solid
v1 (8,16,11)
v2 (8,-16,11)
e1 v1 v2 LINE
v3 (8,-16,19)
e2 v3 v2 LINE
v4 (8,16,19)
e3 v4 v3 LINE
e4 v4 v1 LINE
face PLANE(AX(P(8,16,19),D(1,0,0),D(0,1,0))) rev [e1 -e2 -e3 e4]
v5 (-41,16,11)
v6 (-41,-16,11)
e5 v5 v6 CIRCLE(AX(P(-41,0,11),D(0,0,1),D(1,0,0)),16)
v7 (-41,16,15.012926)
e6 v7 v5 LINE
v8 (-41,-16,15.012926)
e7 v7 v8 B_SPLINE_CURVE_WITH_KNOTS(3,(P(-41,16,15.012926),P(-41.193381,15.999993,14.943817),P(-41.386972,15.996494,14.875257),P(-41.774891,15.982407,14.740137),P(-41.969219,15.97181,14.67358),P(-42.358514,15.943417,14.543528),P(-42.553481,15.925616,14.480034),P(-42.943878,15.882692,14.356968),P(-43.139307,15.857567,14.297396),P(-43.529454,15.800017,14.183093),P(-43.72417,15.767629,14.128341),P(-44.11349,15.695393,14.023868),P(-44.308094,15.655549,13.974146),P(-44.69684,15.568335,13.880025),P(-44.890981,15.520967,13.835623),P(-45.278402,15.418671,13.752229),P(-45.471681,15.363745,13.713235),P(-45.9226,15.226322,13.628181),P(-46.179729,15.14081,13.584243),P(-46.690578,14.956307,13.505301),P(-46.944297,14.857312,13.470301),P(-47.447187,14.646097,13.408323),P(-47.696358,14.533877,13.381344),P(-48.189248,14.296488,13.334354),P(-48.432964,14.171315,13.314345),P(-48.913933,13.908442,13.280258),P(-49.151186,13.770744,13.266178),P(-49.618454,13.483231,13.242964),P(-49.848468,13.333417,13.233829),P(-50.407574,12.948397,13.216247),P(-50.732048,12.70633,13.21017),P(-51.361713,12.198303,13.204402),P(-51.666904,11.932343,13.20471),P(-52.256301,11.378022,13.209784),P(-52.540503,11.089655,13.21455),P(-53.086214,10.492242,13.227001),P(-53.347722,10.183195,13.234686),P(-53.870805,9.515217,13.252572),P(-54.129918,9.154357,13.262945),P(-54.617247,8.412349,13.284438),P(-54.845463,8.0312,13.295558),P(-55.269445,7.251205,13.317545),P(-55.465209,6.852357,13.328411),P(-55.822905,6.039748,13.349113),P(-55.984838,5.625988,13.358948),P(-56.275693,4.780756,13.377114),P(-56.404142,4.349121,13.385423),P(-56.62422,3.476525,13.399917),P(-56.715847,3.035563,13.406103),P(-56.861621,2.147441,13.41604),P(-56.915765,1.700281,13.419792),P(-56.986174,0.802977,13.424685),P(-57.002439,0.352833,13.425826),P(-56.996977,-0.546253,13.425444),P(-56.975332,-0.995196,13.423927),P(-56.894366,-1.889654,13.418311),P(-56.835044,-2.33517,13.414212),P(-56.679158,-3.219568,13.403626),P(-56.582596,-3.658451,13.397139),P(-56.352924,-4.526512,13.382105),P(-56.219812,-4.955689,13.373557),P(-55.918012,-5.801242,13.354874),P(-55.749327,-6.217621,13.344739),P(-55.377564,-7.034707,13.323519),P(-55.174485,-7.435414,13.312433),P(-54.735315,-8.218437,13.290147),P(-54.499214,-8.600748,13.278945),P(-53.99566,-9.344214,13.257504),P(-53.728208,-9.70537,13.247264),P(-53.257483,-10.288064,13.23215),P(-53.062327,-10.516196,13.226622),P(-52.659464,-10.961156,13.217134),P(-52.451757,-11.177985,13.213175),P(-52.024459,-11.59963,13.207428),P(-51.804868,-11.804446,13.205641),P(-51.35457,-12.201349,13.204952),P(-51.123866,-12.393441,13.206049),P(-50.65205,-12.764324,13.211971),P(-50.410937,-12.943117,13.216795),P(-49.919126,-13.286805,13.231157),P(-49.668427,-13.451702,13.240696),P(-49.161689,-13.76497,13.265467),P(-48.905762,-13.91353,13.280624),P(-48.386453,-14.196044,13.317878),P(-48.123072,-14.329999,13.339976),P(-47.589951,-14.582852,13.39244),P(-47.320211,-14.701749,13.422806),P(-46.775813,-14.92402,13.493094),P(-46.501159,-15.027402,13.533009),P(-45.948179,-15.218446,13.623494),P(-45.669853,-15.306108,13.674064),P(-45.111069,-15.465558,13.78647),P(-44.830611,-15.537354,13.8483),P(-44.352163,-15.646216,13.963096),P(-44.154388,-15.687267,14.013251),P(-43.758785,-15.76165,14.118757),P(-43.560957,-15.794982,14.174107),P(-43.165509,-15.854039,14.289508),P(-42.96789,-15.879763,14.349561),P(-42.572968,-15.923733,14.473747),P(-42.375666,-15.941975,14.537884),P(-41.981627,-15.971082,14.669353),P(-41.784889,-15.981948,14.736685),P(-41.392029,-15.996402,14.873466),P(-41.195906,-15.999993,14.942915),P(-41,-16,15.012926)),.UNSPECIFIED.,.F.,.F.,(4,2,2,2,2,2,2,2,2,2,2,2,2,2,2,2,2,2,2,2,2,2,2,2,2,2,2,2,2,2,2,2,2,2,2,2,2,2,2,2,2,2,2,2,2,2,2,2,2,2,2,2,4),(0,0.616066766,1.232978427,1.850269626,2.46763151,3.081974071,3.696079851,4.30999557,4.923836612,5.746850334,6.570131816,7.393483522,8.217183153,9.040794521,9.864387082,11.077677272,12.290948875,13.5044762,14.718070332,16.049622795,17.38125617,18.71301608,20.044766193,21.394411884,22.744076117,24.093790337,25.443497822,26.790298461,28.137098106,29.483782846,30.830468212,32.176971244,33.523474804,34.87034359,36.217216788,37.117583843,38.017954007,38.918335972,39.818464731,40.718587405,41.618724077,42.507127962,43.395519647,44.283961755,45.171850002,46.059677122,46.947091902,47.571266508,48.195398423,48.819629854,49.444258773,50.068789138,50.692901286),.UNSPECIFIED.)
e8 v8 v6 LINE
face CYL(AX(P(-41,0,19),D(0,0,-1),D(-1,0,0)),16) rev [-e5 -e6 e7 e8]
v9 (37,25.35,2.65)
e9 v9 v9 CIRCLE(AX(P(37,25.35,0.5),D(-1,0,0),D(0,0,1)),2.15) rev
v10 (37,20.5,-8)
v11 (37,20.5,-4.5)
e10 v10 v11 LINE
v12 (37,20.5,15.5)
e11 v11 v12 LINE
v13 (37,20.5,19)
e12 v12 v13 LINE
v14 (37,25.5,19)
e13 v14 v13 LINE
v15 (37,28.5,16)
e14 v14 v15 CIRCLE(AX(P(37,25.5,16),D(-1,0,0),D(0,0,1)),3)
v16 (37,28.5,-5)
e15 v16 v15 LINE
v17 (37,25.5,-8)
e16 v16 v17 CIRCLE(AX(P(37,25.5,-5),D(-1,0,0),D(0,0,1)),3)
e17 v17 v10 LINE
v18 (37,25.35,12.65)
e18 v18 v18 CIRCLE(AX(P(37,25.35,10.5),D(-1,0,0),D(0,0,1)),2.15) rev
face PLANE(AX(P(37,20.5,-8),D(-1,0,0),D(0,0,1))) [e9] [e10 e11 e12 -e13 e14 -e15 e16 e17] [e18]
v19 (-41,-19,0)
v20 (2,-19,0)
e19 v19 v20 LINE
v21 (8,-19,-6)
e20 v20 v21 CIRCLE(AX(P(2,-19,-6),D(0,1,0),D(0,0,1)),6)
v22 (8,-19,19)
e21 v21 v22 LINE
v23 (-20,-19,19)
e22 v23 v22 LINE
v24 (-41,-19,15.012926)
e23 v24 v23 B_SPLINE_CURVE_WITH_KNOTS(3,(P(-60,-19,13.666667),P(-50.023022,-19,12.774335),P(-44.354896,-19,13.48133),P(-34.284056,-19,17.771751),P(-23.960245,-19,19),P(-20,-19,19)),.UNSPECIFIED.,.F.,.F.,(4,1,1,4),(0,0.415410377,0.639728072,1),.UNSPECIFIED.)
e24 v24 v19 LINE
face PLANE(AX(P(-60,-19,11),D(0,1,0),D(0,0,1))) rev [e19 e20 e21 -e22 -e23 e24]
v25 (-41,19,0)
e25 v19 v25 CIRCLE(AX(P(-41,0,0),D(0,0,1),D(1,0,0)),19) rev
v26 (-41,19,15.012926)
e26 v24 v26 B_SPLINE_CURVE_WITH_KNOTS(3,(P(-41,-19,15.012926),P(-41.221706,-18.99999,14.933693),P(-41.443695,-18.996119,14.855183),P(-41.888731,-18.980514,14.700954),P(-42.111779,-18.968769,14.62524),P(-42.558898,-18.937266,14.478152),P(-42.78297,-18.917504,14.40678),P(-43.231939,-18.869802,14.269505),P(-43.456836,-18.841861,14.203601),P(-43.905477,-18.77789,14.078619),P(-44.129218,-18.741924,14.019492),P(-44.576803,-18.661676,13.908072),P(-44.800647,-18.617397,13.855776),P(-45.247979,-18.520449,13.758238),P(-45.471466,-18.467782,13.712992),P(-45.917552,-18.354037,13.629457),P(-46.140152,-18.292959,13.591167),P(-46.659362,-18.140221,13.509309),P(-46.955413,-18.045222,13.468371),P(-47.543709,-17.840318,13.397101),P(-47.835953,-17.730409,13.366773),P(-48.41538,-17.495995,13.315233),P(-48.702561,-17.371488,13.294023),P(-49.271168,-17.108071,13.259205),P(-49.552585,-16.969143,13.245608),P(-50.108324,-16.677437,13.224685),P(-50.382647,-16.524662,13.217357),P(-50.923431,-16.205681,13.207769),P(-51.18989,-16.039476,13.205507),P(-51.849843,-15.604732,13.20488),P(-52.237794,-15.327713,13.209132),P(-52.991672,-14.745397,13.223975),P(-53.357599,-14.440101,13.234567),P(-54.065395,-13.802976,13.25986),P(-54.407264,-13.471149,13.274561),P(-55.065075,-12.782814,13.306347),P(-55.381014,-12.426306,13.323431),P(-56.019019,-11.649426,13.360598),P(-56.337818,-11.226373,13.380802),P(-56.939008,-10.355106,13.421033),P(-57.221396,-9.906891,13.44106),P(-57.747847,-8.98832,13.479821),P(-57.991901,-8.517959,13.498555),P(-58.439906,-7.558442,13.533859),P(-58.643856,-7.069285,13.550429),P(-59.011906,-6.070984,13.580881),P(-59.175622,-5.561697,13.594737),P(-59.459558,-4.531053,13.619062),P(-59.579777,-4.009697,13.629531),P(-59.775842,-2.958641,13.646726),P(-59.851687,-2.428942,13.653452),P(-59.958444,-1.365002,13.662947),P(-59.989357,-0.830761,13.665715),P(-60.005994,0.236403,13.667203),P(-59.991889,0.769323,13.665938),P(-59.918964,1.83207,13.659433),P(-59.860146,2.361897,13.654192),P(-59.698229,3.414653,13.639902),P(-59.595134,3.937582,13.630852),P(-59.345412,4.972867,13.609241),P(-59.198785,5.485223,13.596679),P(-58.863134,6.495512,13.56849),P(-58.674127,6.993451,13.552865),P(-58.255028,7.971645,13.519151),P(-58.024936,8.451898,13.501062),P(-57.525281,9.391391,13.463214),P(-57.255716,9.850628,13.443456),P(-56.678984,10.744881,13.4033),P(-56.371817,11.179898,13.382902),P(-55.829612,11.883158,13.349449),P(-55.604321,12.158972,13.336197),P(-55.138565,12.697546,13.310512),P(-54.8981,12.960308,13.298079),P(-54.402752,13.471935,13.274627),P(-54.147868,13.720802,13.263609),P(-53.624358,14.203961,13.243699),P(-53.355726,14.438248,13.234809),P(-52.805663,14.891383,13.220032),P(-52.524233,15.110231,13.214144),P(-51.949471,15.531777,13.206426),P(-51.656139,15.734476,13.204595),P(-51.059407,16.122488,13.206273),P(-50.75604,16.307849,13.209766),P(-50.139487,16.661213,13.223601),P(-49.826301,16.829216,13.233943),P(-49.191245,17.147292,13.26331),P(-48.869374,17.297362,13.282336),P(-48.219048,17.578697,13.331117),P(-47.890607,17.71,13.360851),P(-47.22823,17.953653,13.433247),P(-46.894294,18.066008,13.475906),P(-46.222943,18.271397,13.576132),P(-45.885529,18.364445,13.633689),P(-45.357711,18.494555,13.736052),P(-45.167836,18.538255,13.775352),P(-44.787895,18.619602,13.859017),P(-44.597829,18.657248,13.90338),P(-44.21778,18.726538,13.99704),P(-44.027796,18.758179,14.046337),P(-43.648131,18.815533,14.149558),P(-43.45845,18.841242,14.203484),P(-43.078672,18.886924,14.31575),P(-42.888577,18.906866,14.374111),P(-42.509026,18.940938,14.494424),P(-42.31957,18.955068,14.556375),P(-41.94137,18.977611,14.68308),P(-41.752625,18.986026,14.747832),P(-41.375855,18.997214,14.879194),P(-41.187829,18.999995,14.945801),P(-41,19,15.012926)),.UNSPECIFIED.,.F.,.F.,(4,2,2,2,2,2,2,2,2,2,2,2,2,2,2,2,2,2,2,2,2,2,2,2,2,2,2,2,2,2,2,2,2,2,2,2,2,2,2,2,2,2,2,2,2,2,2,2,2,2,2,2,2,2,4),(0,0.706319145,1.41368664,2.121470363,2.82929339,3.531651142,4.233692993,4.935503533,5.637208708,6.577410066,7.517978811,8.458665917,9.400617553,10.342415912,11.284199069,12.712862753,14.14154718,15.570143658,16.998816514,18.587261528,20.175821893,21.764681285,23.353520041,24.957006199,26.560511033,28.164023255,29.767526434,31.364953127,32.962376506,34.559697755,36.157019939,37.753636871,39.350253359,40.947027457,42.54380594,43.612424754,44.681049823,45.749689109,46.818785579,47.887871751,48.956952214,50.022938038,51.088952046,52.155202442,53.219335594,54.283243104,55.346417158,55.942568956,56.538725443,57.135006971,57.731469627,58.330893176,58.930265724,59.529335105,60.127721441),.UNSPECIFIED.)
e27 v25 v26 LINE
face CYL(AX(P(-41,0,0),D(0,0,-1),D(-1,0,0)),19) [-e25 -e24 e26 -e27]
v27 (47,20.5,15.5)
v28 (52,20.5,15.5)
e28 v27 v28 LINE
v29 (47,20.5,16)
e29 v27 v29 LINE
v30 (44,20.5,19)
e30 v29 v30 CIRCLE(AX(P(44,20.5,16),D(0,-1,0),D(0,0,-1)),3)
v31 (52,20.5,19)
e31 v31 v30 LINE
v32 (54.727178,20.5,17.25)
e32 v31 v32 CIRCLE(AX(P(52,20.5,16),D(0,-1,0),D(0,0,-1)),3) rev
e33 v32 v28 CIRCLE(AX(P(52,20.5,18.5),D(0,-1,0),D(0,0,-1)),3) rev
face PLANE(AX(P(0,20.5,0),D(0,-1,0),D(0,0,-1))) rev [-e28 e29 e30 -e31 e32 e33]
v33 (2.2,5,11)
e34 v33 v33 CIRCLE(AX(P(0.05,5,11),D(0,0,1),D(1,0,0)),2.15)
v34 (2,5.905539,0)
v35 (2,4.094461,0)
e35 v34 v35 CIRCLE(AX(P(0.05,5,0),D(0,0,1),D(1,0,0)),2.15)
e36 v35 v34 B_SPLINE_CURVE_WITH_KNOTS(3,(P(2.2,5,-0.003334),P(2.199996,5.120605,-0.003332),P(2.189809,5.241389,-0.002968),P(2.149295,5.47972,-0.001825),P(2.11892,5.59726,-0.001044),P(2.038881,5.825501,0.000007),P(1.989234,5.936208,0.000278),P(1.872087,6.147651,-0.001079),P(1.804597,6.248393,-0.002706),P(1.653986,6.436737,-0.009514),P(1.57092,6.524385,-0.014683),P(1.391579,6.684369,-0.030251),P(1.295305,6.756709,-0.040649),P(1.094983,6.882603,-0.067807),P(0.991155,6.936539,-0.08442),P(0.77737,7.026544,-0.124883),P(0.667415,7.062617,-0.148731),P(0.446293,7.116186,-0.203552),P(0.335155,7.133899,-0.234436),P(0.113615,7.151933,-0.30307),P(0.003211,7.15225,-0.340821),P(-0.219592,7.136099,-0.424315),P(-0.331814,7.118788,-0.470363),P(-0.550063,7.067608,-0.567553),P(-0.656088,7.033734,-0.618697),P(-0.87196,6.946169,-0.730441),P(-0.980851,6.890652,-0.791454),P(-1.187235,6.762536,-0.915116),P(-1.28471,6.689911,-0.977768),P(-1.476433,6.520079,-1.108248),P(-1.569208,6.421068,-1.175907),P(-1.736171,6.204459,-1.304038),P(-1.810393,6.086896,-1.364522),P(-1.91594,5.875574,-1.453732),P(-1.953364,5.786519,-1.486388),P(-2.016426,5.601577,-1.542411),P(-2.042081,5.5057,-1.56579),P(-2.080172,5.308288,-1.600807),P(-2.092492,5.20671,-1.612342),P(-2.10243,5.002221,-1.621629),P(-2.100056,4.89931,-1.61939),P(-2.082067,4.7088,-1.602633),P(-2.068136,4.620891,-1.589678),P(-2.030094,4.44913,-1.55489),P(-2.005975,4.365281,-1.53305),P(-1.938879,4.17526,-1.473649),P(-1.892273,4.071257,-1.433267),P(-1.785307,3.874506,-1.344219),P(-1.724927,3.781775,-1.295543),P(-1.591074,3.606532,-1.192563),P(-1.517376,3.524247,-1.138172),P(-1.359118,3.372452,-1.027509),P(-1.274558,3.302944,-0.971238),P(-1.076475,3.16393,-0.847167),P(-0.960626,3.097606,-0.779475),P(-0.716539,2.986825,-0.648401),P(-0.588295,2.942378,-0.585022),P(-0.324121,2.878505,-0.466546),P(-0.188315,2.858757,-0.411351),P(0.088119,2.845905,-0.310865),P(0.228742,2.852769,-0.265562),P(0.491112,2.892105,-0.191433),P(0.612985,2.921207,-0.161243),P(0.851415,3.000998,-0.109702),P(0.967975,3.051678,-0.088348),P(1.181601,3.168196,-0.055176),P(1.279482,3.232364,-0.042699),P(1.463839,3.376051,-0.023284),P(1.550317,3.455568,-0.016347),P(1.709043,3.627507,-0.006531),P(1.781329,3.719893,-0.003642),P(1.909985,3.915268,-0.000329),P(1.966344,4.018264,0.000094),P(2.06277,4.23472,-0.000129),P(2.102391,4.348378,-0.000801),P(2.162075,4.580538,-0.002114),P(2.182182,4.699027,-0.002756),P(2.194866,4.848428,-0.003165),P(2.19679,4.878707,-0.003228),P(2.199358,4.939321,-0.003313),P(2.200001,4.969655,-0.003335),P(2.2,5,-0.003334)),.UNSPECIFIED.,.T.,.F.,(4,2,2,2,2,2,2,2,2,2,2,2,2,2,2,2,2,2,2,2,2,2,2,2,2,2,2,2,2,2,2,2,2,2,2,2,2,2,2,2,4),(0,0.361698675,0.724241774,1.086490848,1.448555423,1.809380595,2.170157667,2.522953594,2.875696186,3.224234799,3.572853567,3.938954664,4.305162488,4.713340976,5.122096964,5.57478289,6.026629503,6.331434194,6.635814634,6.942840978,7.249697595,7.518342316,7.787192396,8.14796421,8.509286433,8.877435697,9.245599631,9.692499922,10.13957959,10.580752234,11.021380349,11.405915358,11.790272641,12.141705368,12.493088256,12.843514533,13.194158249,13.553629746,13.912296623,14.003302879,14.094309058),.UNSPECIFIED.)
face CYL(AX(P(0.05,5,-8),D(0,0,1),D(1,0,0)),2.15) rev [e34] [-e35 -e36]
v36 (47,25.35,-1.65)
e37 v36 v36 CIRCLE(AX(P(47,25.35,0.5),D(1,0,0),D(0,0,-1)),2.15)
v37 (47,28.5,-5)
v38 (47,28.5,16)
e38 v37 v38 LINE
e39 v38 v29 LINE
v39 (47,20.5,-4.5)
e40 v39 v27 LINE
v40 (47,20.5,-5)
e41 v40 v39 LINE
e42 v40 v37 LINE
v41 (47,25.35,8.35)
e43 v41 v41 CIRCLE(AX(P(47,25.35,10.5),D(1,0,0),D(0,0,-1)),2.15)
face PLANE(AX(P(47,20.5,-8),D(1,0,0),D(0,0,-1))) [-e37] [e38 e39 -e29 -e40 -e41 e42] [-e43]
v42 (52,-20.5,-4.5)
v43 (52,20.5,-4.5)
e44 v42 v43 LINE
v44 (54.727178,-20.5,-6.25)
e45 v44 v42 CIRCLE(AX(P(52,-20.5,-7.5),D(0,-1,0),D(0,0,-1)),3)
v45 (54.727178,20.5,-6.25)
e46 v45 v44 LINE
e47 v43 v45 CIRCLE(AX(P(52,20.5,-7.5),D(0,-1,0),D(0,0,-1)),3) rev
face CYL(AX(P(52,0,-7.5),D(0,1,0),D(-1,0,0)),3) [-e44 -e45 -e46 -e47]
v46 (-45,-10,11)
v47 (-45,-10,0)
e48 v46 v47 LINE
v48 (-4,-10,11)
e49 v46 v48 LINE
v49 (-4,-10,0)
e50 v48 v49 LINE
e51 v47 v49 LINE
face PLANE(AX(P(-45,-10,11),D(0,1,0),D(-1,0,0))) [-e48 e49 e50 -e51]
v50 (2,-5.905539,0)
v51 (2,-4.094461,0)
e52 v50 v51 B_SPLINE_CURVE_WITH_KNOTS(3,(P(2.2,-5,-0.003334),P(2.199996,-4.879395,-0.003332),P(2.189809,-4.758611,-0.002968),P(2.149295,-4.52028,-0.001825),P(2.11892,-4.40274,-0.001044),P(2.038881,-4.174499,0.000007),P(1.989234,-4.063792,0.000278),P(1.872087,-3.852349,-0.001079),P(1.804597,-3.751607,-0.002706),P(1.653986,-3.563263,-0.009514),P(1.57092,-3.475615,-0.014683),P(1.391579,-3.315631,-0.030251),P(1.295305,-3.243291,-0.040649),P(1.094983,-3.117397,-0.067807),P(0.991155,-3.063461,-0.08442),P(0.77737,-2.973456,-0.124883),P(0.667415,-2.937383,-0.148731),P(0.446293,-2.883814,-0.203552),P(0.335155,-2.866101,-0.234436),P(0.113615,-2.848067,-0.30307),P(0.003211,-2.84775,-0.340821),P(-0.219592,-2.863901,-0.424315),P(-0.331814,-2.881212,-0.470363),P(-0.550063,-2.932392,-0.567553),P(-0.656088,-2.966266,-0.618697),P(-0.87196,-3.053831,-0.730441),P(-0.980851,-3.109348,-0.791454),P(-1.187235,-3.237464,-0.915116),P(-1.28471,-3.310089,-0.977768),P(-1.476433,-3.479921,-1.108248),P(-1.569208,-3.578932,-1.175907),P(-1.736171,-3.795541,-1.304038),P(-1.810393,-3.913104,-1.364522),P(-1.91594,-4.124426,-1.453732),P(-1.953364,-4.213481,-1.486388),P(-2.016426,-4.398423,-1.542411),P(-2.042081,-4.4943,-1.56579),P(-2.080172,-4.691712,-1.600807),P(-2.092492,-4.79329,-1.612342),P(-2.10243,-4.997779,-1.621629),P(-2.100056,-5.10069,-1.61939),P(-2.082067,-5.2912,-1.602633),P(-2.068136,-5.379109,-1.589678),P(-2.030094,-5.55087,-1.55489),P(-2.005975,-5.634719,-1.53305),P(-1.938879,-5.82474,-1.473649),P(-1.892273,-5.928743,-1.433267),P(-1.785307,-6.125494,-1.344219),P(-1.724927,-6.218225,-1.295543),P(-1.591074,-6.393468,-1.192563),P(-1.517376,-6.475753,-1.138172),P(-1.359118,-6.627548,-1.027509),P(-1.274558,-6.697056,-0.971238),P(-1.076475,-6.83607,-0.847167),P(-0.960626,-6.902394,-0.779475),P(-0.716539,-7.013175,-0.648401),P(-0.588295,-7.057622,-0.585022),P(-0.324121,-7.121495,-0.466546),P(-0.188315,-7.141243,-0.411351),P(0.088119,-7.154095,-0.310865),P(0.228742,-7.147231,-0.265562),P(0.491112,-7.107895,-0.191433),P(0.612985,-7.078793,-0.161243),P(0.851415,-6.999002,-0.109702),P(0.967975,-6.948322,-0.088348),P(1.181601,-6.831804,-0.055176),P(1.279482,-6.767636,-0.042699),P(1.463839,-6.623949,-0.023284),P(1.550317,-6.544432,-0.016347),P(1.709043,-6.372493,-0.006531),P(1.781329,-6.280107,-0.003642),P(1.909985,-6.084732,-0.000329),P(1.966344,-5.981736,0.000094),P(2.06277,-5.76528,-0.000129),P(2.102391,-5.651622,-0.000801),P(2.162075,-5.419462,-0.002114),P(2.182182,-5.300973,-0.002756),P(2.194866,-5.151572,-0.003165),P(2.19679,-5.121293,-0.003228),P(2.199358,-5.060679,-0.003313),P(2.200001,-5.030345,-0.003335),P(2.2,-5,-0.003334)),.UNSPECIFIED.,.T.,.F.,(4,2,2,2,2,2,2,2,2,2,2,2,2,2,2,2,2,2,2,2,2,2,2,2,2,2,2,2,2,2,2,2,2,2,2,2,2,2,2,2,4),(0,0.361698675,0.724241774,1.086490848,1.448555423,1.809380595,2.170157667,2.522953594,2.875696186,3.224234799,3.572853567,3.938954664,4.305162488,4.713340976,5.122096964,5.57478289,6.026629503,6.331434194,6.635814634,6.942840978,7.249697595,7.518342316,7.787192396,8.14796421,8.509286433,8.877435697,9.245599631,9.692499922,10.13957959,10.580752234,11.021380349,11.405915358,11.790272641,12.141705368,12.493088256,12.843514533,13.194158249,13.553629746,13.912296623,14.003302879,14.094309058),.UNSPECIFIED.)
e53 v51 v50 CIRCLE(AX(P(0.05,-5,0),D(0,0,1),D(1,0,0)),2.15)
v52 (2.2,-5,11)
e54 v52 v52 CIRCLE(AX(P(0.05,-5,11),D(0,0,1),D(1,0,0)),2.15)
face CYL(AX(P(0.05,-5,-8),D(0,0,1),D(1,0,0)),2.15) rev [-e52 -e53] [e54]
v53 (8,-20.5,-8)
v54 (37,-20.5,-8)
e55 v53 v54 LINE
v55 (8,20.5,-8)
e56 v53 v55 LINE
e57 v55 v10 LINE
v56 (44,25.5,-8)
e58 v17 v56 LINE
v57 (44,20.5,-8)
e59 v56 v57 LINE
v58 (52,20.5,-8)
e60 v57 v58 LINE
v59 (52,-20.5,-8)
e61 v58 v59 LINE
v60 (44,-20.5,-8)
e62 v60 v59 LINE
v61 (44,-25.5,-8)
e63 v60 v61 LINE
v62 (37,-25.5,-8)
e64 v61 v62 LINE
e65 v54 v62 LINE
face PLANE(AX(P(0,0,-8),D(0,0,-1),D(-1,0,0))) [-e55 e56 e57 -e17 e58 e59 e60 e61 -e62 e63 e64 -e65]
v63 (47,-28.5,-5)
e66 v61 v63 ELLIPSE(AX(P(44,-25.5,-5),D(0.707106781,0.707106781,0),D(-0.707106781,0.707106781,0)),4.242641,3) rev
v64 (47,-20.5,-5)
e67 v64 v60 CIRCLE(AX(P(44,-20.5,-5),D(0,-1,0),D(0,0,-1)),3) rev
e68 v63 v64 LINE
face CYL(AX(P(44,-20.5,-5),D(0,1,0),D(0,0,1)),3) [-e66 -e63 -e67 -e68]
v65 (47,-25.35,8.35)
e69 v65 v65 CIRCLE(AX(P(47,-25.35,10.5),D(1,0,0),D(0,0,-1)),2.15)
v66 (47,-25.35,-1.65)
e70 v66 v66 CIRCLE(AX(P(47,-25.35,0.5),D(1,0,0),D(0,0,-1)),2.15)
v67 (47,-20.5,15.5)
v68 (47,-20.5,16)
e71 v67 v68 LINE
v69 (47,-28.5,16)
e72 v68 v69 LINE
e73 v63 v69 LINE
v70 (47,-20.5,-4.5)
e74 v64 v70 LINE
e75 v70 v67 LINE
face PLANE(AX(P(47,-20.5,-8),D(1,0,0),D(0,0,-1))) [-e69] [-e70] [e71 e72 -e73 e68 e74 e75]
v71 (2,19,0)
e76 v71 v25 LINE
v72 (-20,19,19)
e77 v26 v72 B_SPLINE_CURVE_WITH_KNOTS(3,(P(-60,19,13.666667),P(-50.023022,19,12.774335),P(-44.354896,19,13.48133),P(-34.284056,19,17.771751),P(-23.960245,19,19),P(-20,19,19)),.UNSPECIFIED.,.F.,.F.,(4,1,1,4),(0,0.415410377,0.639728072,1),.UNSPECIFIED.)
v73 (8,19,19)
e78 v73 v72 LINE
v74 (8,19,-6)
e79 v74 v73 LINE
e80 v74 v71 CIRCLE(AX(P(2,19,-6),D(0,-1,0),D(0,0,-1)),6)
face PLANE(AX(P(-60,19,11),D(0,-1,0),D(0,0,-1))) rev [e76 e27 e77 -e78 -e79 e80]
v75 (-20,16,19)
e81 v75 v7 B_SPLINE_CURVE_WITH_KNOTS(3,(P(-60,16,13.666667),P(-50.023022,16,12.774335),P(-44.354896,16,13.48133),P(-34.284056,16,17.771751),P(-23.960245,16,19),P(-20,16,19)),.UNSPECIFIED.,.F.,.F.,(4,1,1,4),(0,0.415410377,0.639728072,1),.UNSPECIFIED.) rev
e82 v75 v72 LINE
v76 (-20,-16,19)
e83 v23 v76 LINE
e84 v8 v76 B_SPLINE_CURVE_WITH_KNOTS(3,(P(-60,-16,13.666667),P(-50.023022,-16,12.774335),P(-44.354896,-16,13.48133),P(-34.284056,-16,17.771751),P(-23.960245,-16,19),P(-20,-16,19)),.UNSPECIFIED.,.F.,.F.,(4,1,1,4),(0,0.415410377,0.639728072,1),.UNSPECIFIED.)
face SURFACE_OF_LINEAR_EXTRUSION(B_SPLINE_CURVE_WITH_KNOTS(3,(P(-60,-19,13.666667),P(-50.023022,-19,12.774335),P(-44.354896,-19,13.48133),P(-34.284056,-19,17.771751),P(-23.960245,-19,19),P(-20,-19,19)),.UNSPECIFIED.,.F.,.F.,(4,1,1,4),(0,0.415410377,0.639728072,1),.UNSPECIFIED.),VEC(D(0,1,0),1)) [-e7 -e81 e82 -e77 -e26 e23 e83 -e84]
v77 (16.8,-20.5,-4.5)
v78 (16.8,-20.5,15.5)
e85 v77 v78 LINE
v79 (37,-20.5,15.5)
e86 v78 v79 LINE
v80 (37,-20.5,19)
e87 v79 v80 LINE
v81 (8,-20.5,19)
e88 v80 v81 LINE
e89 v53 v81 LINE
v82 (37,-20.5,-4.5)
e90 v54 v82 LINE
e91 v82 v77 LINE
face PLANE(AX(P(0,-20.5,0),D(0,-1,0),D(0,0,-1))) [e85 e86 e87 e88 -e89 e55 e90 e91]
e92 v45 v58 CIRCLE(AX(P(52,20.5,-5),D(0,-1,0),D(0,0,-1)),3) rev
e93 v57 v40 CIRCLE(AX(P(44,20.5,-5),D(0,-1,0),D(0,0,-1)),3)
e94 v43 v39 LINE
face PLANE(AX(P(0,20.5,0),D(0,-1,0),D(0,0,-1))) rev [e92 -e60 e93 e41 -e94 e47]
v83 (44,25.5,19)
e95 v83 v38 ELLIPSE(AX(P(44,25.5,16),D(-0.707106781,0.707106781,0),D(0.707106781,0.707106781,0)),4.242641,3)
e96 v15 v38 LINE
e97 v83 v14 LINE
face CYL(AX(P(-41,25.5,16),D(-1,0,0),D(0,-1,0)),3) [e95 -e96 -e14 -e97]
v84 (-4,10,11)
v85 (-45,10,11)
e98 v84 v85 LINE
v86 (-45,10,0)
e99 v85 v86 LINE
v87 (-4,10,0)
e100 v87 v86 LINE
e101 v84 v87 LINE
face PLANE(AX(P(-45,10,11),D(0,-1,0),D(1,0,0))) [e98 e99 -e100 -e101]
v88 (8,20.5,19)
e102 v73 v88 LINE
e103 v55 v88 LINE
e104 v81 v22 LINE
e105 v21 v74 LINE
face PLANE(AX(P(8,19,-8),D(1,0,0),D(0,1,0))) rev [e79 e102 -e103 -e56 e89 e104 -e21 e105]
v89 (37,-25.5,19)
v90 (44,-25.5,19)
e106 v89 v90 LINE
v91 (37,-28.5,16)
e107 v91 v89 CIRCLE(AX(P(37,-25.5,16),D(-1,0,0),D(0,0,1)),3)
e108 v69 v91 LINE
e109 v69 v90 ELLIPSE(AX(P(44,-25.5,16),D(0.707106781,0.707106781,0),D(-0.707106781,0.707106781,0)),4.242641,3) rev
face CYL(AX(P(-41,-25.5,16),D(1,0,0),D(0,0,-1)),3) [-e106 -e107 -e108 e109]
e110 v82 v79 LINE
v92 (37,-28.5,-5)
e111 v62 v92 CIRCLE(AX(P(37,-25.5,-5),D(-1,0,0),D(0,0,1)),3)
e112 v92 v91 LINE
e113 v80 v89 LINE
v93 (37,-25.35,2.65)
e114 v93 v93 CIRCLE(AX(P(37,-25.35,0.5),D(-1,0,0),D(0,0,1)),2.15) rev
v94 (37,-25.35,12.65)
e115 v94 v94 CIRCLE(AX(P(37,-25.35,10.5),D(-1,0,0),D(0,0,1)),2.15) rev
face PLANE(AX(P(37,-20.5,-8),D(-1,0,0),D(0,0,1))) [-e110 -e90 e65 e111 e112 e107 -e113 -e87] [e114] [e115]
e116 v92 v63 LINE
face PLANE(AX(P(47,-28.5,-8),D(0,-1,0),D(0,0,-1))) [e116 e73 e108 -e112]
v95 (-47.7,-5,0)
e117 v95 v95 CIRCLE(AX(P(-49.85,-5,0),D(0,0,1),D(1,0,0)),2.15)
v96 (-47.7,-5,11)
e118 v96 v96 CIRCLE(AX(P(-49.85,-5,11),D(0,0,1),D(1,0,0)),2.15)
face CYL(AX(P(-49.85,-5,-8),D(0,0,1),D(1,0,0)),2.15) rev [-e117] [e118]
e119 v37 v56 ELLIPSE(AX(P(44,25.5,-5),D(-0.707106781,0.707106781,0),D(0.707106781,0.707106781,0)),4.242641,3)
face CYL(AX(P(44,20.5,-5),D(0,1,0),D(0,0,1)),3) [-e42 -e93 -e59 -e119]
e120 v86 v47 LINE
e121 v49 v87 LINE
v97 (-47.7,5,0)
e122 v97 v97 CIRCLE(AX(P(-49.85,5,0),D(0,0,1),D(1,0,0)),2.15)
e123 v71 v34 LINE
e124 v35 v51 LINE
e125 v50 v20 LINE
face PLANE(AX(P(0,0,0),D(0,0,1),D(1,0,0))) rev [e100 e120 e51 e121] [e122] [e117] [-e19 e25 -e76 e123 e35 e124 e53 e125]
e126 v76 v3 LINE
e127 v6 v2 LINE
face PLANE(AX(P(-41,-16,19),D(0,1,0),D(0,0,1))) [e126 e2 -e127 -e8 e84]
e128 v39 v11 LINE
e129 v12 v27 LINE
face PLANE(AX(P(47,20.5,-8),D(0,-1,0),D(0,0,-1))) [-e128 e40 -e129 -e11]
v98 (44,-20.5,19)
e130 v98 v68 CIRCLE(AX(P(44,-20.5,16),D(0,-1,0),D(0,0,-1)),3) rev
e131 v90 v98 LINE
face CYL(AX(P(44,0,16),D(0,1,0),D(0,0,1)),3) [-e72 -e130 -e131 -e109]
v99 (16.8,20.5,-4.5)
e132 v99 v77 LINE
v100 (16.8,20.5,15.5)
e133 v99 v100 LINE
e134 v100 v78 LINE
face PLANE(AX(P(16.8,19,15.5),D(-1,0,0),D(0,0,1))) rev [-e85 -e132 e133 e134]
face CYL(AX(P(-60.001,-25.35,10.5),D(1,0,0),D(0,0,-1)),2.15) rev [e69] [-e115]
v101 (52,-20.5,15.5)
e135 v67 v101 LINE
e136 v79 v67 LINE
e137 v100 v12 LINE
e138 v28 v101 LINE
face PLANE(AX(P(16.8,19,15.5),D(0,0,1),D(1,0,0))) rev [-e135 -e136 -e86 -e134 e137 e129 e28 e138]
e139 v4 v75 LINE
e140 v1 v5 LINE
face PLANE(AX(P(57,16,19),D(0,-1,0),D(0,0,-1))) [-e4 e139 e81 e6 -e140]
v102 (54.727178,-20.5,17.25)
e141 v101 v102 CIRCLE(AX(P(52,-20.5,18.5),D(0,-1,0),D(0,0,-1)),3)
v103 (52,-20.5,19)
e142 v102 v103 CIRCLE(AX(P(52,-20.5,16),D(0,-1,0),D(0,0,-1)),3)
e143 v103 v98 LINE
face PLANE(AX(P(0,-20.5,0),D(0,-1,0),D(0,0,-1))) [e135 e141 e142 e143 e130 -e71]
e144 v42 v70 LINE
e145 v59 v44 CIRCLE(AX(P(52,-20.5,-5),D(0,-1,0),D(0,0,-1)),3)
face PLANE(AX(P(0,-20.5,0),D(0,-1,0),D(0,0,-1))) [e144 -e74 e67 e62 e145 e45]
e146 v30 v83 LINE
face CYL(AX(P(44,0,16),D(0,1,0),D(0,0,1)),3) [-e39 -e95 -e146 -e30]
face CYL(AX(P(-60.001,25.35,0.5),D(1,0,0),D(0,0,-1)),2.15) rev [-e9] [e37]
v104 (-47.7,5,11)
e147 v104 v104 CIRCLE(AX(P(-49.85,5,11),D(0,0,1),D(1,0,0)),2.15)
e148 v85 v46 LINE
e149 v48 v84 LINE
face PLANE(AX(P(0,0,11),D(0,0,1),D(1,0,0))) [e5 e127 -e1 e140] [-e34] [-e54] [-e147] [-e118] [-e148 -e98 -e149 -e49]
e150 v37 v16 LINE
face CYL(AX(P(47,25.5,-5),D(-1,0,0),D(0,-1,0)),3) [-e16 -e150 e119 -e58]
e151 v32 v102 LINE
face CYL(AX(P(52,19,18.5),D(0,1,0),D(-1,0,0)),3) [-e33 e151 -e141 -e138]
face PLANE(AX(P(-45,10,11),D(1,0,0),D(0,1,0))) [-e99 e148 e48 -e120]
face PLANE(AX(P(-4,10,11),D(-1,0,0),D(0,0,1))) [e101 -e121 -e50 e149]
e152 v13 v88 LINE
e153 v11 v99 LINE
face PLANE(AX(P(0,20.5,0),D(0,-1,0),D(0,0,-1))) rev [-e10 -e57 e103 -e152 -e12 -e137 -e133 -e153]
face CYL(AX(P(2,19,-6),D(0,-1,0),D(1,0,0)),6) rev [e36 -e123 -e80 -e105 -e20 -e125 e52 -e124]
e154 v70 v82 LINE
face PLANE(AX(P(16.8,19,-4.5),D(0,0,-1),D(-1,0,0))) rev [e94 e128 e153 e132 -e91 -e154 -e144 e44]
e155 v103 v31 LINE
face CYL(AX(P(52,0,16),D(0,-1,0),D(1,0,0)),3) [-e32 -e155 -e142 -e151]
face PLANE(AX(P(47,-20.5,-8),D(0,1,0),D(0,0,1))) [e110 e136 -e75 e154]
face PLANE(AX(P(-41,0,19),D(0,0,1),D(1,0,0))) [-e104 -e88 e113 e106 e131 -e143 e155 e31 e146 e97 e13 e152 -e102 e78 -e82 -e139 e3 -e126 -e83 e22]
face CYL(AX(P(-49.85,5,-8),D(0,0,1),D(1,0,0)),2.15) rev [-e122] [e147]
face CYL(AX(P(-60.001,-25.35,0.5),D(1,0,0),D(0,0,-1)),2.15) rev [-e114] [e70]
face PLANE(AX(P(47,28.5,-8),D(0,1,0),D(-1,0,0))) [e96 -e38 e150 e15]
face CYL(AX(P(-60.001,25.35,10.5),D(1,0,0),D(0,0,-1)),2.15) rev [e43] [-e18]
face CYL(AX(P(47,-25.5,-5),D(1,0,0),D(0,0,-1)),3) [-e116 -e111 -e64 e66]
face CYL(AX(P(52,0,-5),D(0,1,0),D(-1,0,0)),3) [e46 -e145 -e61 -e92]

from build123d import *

# Parameters (mm, degrees)
SKETCH1_W               = 120
SKETCH1_H               = 38
SKETCH1_W_2             = 41
SKETCH1_H_2             = 20
BOSS_EXTRUDE1_DEPTH     = 11
FILLET1_RADIUS          = 19
FILLET1_LENGTH          = 11
BOSS_EXTRUDE2_START     = 8
BOSS_EXTRUDE2_DEPTH     = 8
FILLET2_R               = 16
CUT_EXTRUDE2_DEPTH      = 66.741919656
CUT_EXTRUDE2_DEPTH_BACK = 66.741919656
BOSS_EXTRUDE3_START     = 8
BOSS_EXTRUDE3_OUTLINE_W = 32
BOSS_EXTRUDE3_OUTLINE_H = 8
BOSS_EXTRUDE3_DEPTH     = 49
SKETCH8_W               = 52
SKETCH8_H               = 38
BOSS_EXTRUDE4_DEPTH     = 8
SKETCH9_W               = 27
SKETCH9_H               = 38
CUT_EXTRUDE3_DEPTH      = 5
BOSS_EXTRUDE5_START     = -2
SKETCH11_W              = 41
SKETCH11_H              = 20
BOSS_EXTRUDE5_DEPTH     = 2
SKETCH13_R              = 6.5
CUT_EXTRUDE6_DEPTH      = 8
FILLET7_R               = 6
SKETCH25_R              = 2.15
CUT_EXTRUDE13_DEPTH     = 66.741919805
SKETCH10_W              = 38.2
SKETCH10_H              = 20
CUT_EXTRUDE14_DEPTH     = 74.518705262
BOSS_EXTRUDE6_DEPTH     = 1.5
LPATTERN1_COUNT         = 2
LPATTERN1_PITCH         = 39.5
SKETCH27_W              = 10
SKETCH27_H              = 8
BOSS_EXTRUDE7_DEPTH     = 27
FILLET8_R               = 3
CUT_EXTRUDE15_REACH     = 114.349
SKETCH28_R              = 2.15


# Read off the part's stored shape, not the designer's step: Boss-Extrude3
# Some blends are built 0.0001 mm under size
with BuildPart() as part:
    # Sketch1 → Boss-Extrude1 (new body)
    with BuildSketch(Plane.XY):
        Rectangle(SKETCH1_W, SKETCH1_H)
        with Locations((-24.5, 0)):
            Rectangle(SKETCH1_W_2, SKETCH1_H_2, mode=Mode.SUBTRACT)
    extrude(amount=BOSS_EXTRUDE1_DEPTH)

    # Fillet1: full round fillet: the end face becomes a half cylinder, R = half its width
    fillet1_face = Plane((-60, 0, 5.5), x_dir=(0, 0, 1), z_dir=(-1, 0, 0))  # on the end face: x along it, z out of the body
    fillet1_slab = fillet1_face.offset(-FILLET1_RADIUS / 2) * Box(FILLET1_LENGTH, 2 * FILLET1_RADIUS, FILLET1_RADIUS, mode=Mode.PRIVATE)  # the body's end, R deep
    fillet1_round = Plane((-41, 0, 5.5), x_dir=(-1, 0, 0), z_dir=(0, 0, 1)) * Cylinder(FILLET1_RADIUS, FILLET1_LENGTH, mode=Mode.PRIVATE)  # its axis R under the face
    add(fillet1_slab - fillet1_round, mode=Mode.SUBTRACT)

    # Sketch5 → Boss-Extrude2 (add)
    with BuildSketch(Plane.XY.offset(11).offset(BOSS_EXTRUDE2_START)):
        with BuildLine():
            Line((60, 19), (-41, 19))
            ThreePointArc((-41, 19), (-60, 0), (-41, -19))
            Line((-41, -19), (60, -19))
            Line((60, -19), (60, 19))
        make_face()
        with BuildLine():
            Line((57, 16), (-41, 16))
            ThreePointArc((-41, 16), (-57, 0), (-41, -16))
            Line((-41, -16), (57, -16))
            Line((57, -16), (57, 16))
        make_face(mode=Mode.SUBTRACT)
    extrude(amount=-BOSS_EXTRUDE2_DEPTH)

    # Fillet2
    fillet2_edges = [part.edges().sort_by_distance(p)[0] for p in [
        (57, 16, 15),
        (57, -16, 15),
    ]]
    fillet(fillet2_edges, radius=FILLET2_R - 0.0001)  # a hair under: the kernel refuses the full size

    # Sketch6 → Cut-Extrude2 (cut, two sides: drawn at the far end of the back side and taken through both)
    with BuildSketch(Plane(origin=(0, 0, 0), x_dir=(1, 0, 0), z_dir=(0, 1, 0)).offset(-CUT_EXTRUDE2_DEPTH_BACK)):
        with BuildLine():
            add(Edge.make_bspline(
                [(-60, -13.666666667), (-50.023022061, -12.774335398), (-44.35489615, -13.481329797), (-34.284055631, -17.771751053), (-23.960245459, -19), (-20, -19)],
                knots=[0, 0, 0, 0, 0.415410377, 0.639728072, 1, 1, 1, 1], degree=3))
            Line((-20, -19), (-60, -19))
            Line((-60, -19), (-60, -13.666666667))
        make_face()
    extrude(amount=CUT_EXTRUDE2_DEPTH + CUT_EXTRUDE2_DEPTH_BACK, mode=Mode.SUBTRACT)

    # Boss-Extrude3 outline → Boss-Extrude3 (add)
    with BuildSketch(Plane.YZ.offset(BOSS_EXTRUDE3_START)):
        with Locations((0, 15)):
            Rectangle(BOSS_EXTRUDE3_OUTLINE_W, BOSS_EXTRUDE3_OUTLINE_H)
    extrude(amount=BOSS_EXTRUDE3_DEPTH)

    # Sketch8 → Boss-Extrude4 (add)
    with BuildSketch(Plane(origin=(0, 0, 0), x_dir=(-1, 0, 0), z_dir=(0, 0, -1))):
        with Locations((-34, 0)):
            Rectangle(SKETCH8_W, SKETCH8_H)
    extrude(amount=BOSS_EXTRUDE4_DEPTH)

    # Sketch9 → Cut-Extrude3 (cut)
    with BuildSketch(Plane(origin=(60, 0, 0), x_dir=(0, 0, -1), z_dir=(1, 0, 0))):
        with Locations((-5.5, 0)):
            Rectangle(SKETCH9_W, SKETCH9_H)
    extrude(amount=-CUT_EXTRUDE3_DEPTH, mode=Mode.SUBTRACT)

    # Sketch11 → Boss-Extrude5 (add)
    with BuildSketch(Plane(origin=(0, 0, 0), x_dir=(-1, 0, 0), z_dir=(0, 0, -1)).offset(BOSS_EXTRUDE5_START)):
        with BuildLine():
            Line((-8, 19), (-8, -19))
            Line((-8, -19), (41, -19))
            ThreePointArc((41, -19), (60, 0), (41, 19))
            Line((41, 19), (-8, 19))
        make_face()
        with Locations((24.5, 0)):
            Rectangle(SKETCH11_W, SKETCH11_H, mode=Mode.SUBTRACT)
    extrude(amount=BOSS_EXTRUDE5_DEPTH)

    # Sketch13 → Cut-Extrude6 (cut)
    with BuildSketch(Plane(origin=(55, 0, 0), x_dir=(0, 0, -1), z_dir=(1, 0, 0))):
        with Locations(Location((-5.5, 5.3, 0), (0, 0, 90))):
            Circle(SKETCH13_R)
    extrude(amount=-CUT_EXTRUDE6_DEPTH, mode=Mode.SUBTRACT)

    # Fillet7
    fillet7_edges = [part.edges().sort_by_distance(p)[0] for p in [
        (8, 0, 0),
    ]]
    fillet(fillet7_edges, radius=FILLET7_R)

    # Sketch25 → Cut-Extrude13 (cut, through all)
    with BuildSketch(Plane.XY.offset(11)):
        with Locations((-49.85, 5)):
            Circle(SKETCH25_R)
        with Locations((-49.85, -5)):
            Circle(SKETCH25_R)
        with Locations((0.05, -5)):
            Circle(SKETCH25_R)
        with Locations((0.05, 5)):
            Circle(SKETCH25_R)
    extrude(amount=-CUT_EXTRUDE13_DEPTH, mode=Mode.SUBTRACT)

    # Sketch10 → Cut-Extrude14 (cut, through all)
    with BuildSketch(Plane.XZ.offset(19)):
        with Locations((35.9, 5.5)):
            Rectangle(SKETCH10_W, SKETCH10_H)
    extrude(amount=-CUT_EXTRUDE14_DEPTH, mode=Mode.SUBTRACT)

    # Sketch26 → Boss-Extrude6 (add)
    with BuildSketch(Plane.XZ.offset(19)):
        Polygon((8, -8), (55, -8), (55, -4.5), (16.8, -4.5), (16.8, 15.5), (55, 15.5), (55, 19), (8, 19), (8, -6), align=None)
    boss_extrude6 = extrude(amount=BOSS_EXTRUDE6_DEPTH)

    # LPattern1: Boss-Extrude6 ×2
    with Locations(*[(0, i * LPATTERN1_PITCH, 0) for i in range(1, LPATTERN1_COUNT)]):
        add(boss_extrude6)

    # Sketch27 → Boss-Extrude7 (add, through all)
    with BuildSketch(Plane.XY.offset(19)):
        with Locations((42, 24.5)):
            Rectangle(SKETCH27_W, SKETCH27_H)
        with Locations((42, -24.5)):
            Rectangle(SKETCH27_W, SKETCH27_H)
    extrude(amount=-BOSS_EXTRUDE7_DEPTH)

    # Fillet8
    # the kernel refuses this fillet: 3 mm, written as the material it takes off along each edge
    with BuildSketch(Plane(origin=(55, -28, 19), x_dir=(-1, 0, 0), z_dir=(0, 1, 0)), Plane(origin=(55, 28, -8), x_dir=(-1, 0, 0), z_dir=(0, -1, 0)), Plane(origin=(55, -28, 15.5), x_dir=(0, 0, 1), z_dir=(0, 1, 0))) as fillet8_piece_1:
        with BuildLine():
            CenterArc((FILLET8_R, -FILLET8_R), FILLET8_R, 90, 90)
            Line((0, -FILLET8_R), (0, 0))
            Line((0, 0), (FILLET8_R, 0))
        make_face()
    extrude(amount=56, mode=Mode.SUBTRACT)
    with BuildSketch(Plane(origin=(55, 28, -4.5), x_dir=(-1, 0, 0), z_dir=(0, -1, 0))) as fillet8_piece_2:
        with BuildLine():
            CenterArc((FILLET8_R, FILLET8_R), FILLET8_R, 180, 90)
            Line((0, FILLET8_R), (0, 0))
            Line((0, 0), (FILLET8_R, 0))
        make_face()
    extrude(amount=56, mode=Mode.SUBTRACT)
    with BuildSketch(Plane(origin=(47, 36, -8), x_dir=(-1, 0, 0), z_dir=(0, -1, 0)), Plane(origin=(47, -36, 19), x_dir=(-1, 0, 0), z_dir=(0, 1, 0))) as fillet8_piece_3:
        with BuildLine():
            CenterArc((FILLET8_R, -FILLET8_R), FILLET8_R, 90, 90)
            Line((0, -FILLET8_R), (0, 0))
            Line((0, 0), (FILLET8_R, 0))
        make_face()
    extrude(amount=15.5, mode=Mode.SUBTRACT)
    with BuildSketch(Plane(origin=(29.5, 28.5, -8), x_dir=(0, -1, 0), z_dir=(1, 0, 0)), Plane(origin=(29.5, -28.5, 19), x_dir=(0, 1, 0), z_dir=(1, 0, 0))) as fillet8_piece_4:
        with BuildLine():
            CenterArc((FILLET8_R, -FILLET8_R), FILLET8_R, 90, 90)
            Line((0, -FILLET8_R), (0, 0))
            Line((0, 0), (FILLET8_R, 0))
        make_face()
    extrude(amount=25, mode=Mode.SUBTRACT)
    with BuildSketch(Plane(origin=(47, 36, 19), x_dir=(-1, 0, 0), z_dir=(0, -1, 0)), Plane(origin=(47, -36, -8), x_dir=(-1, 0, 0), z_dir=(0, 1, 0))) as fillet8_piece_5:
        with BuildLine():
            CenterArc((FILLET8_R, FILLET8_R), FILLET8_R, 180, 90)
            Line((0, FILLET8_R), (0, 0))
            Line((0, 0), (FILLET8_R, 0))
        make_face()
    extrude(amount=15.5, mode=Mode.SUBTRACT)
    with BuildSketch(Plane(origin=(29.5, 28.5, 19), x_dir=(0, -1, 0), z_dir=(1, 0, 0)), Plane(origin=(29.5, -28.5, -8), x_dir=(0, 1, 0), z_dir=(1, 0, 0))) as fillet8_piece_6:
        with BuildLine():
            CenterArc((FILLET8_R, FILLET8_R), FILLET8_R, 180, 90)
            Line((0, FILLET8_R), (0, 0))
            Line((0, 0), (FILLET8_R, 0))
        make_face()
    extrude(amount=25, mode=Mode.SUBTRACT)

    # Sketch28 → Cut-Extrude15 (cut, up to next)
    with BuildSketch(Plane(origin=(47, 0, 0), x_dir=(0, 0, -1), z_dir=(1, 0, 0)), mode=Mode.PRIVATE) as cut_extrude15_sk1:
        with Locations((-10.5, 25.35)):
            Circle(SKETCH28_R)
    cut_extrude15_tool1 = extrude(cut_extrude15_sk1.sketch, amount=-CUT_EXTRUDE15_REACH, mode=Mode.PRIVATE) & part.part
    # Sketch28 → Cut-Extrude15 (cut, up to next)
    with BuildSketch(Plane(origin=(47, 0, 0), x_dir=(0, 0, -1), z_dir=(1, 0, 0)), mode=Mode.PRIVATE) as cut_extrude15_sk2:
        with Locations((-0.5, 25.35)):
            Circle(SKETCH28_R)
    cut_extrude15_tool2 = extrude(cut_extrude15_sk2.sketch, amount=-CUT_EXTRUDE15_REACH, mode=Mode.PRIVATE) & part.part
    # Sketch28 → Cut-Extrude15 (cut, up to next)
    with BuildSketch(Plane(origin=(47, 0, 0), x_dir=(0, 0, -1), z_dir=(1, 0, 0)), mode=Mode.PRIVATE) as cut_extrude15_sk3:
        with Locations((-0.5, -25.35)):
            Circle(SKETCH28_R)
    cut_extrude15_tool3 = extrude(cut_extrude15_sk3.sketch, amount=-CUT_EXTRUDE15_REACH, mode=Mode.PRIVATE) & part.part
    # Sketch28 → Cut-Extrude15 (cut, up to next)
    with BuildSketch(Plane(origin=(47, 0, 0), x_dir=(0, 0, -1), z_dir=(1, 0, 0)), mode=Mode.PRIVATE) as cut_extrude15_sk4:
        with Locations((-10.5, -25.35)):
            Circle(SKETCH28_R)
    cut_extrude15_tool4 = extrude(cut_extrude15_sk4.sketch, amount=-CUT_EXTRUDE15_REACH, mode=Mode.PRIVATE) & part.part
    add(cut_extrude15_tool1.solids().sort_by_distance((47, 25.35, 10.5))[0], mode=Mode.SUBTRACT)
    add(cut_extrude15_tool2.solids().sort_by_distance((47, 25.35, 0.5))[0], mode=Mode.SUBTRACT)
    add(cut_extrude15_tool3.solids().sort_by_distance((47, -25.35, 0.5))[0], mode=Mode.SUBTRACT)
    add(cut_extrude15_tool4.solids().sort_by_distance((47, -25.35, 10.5))[0], mode=Mode.SUBTRACT)


solid = part.part
